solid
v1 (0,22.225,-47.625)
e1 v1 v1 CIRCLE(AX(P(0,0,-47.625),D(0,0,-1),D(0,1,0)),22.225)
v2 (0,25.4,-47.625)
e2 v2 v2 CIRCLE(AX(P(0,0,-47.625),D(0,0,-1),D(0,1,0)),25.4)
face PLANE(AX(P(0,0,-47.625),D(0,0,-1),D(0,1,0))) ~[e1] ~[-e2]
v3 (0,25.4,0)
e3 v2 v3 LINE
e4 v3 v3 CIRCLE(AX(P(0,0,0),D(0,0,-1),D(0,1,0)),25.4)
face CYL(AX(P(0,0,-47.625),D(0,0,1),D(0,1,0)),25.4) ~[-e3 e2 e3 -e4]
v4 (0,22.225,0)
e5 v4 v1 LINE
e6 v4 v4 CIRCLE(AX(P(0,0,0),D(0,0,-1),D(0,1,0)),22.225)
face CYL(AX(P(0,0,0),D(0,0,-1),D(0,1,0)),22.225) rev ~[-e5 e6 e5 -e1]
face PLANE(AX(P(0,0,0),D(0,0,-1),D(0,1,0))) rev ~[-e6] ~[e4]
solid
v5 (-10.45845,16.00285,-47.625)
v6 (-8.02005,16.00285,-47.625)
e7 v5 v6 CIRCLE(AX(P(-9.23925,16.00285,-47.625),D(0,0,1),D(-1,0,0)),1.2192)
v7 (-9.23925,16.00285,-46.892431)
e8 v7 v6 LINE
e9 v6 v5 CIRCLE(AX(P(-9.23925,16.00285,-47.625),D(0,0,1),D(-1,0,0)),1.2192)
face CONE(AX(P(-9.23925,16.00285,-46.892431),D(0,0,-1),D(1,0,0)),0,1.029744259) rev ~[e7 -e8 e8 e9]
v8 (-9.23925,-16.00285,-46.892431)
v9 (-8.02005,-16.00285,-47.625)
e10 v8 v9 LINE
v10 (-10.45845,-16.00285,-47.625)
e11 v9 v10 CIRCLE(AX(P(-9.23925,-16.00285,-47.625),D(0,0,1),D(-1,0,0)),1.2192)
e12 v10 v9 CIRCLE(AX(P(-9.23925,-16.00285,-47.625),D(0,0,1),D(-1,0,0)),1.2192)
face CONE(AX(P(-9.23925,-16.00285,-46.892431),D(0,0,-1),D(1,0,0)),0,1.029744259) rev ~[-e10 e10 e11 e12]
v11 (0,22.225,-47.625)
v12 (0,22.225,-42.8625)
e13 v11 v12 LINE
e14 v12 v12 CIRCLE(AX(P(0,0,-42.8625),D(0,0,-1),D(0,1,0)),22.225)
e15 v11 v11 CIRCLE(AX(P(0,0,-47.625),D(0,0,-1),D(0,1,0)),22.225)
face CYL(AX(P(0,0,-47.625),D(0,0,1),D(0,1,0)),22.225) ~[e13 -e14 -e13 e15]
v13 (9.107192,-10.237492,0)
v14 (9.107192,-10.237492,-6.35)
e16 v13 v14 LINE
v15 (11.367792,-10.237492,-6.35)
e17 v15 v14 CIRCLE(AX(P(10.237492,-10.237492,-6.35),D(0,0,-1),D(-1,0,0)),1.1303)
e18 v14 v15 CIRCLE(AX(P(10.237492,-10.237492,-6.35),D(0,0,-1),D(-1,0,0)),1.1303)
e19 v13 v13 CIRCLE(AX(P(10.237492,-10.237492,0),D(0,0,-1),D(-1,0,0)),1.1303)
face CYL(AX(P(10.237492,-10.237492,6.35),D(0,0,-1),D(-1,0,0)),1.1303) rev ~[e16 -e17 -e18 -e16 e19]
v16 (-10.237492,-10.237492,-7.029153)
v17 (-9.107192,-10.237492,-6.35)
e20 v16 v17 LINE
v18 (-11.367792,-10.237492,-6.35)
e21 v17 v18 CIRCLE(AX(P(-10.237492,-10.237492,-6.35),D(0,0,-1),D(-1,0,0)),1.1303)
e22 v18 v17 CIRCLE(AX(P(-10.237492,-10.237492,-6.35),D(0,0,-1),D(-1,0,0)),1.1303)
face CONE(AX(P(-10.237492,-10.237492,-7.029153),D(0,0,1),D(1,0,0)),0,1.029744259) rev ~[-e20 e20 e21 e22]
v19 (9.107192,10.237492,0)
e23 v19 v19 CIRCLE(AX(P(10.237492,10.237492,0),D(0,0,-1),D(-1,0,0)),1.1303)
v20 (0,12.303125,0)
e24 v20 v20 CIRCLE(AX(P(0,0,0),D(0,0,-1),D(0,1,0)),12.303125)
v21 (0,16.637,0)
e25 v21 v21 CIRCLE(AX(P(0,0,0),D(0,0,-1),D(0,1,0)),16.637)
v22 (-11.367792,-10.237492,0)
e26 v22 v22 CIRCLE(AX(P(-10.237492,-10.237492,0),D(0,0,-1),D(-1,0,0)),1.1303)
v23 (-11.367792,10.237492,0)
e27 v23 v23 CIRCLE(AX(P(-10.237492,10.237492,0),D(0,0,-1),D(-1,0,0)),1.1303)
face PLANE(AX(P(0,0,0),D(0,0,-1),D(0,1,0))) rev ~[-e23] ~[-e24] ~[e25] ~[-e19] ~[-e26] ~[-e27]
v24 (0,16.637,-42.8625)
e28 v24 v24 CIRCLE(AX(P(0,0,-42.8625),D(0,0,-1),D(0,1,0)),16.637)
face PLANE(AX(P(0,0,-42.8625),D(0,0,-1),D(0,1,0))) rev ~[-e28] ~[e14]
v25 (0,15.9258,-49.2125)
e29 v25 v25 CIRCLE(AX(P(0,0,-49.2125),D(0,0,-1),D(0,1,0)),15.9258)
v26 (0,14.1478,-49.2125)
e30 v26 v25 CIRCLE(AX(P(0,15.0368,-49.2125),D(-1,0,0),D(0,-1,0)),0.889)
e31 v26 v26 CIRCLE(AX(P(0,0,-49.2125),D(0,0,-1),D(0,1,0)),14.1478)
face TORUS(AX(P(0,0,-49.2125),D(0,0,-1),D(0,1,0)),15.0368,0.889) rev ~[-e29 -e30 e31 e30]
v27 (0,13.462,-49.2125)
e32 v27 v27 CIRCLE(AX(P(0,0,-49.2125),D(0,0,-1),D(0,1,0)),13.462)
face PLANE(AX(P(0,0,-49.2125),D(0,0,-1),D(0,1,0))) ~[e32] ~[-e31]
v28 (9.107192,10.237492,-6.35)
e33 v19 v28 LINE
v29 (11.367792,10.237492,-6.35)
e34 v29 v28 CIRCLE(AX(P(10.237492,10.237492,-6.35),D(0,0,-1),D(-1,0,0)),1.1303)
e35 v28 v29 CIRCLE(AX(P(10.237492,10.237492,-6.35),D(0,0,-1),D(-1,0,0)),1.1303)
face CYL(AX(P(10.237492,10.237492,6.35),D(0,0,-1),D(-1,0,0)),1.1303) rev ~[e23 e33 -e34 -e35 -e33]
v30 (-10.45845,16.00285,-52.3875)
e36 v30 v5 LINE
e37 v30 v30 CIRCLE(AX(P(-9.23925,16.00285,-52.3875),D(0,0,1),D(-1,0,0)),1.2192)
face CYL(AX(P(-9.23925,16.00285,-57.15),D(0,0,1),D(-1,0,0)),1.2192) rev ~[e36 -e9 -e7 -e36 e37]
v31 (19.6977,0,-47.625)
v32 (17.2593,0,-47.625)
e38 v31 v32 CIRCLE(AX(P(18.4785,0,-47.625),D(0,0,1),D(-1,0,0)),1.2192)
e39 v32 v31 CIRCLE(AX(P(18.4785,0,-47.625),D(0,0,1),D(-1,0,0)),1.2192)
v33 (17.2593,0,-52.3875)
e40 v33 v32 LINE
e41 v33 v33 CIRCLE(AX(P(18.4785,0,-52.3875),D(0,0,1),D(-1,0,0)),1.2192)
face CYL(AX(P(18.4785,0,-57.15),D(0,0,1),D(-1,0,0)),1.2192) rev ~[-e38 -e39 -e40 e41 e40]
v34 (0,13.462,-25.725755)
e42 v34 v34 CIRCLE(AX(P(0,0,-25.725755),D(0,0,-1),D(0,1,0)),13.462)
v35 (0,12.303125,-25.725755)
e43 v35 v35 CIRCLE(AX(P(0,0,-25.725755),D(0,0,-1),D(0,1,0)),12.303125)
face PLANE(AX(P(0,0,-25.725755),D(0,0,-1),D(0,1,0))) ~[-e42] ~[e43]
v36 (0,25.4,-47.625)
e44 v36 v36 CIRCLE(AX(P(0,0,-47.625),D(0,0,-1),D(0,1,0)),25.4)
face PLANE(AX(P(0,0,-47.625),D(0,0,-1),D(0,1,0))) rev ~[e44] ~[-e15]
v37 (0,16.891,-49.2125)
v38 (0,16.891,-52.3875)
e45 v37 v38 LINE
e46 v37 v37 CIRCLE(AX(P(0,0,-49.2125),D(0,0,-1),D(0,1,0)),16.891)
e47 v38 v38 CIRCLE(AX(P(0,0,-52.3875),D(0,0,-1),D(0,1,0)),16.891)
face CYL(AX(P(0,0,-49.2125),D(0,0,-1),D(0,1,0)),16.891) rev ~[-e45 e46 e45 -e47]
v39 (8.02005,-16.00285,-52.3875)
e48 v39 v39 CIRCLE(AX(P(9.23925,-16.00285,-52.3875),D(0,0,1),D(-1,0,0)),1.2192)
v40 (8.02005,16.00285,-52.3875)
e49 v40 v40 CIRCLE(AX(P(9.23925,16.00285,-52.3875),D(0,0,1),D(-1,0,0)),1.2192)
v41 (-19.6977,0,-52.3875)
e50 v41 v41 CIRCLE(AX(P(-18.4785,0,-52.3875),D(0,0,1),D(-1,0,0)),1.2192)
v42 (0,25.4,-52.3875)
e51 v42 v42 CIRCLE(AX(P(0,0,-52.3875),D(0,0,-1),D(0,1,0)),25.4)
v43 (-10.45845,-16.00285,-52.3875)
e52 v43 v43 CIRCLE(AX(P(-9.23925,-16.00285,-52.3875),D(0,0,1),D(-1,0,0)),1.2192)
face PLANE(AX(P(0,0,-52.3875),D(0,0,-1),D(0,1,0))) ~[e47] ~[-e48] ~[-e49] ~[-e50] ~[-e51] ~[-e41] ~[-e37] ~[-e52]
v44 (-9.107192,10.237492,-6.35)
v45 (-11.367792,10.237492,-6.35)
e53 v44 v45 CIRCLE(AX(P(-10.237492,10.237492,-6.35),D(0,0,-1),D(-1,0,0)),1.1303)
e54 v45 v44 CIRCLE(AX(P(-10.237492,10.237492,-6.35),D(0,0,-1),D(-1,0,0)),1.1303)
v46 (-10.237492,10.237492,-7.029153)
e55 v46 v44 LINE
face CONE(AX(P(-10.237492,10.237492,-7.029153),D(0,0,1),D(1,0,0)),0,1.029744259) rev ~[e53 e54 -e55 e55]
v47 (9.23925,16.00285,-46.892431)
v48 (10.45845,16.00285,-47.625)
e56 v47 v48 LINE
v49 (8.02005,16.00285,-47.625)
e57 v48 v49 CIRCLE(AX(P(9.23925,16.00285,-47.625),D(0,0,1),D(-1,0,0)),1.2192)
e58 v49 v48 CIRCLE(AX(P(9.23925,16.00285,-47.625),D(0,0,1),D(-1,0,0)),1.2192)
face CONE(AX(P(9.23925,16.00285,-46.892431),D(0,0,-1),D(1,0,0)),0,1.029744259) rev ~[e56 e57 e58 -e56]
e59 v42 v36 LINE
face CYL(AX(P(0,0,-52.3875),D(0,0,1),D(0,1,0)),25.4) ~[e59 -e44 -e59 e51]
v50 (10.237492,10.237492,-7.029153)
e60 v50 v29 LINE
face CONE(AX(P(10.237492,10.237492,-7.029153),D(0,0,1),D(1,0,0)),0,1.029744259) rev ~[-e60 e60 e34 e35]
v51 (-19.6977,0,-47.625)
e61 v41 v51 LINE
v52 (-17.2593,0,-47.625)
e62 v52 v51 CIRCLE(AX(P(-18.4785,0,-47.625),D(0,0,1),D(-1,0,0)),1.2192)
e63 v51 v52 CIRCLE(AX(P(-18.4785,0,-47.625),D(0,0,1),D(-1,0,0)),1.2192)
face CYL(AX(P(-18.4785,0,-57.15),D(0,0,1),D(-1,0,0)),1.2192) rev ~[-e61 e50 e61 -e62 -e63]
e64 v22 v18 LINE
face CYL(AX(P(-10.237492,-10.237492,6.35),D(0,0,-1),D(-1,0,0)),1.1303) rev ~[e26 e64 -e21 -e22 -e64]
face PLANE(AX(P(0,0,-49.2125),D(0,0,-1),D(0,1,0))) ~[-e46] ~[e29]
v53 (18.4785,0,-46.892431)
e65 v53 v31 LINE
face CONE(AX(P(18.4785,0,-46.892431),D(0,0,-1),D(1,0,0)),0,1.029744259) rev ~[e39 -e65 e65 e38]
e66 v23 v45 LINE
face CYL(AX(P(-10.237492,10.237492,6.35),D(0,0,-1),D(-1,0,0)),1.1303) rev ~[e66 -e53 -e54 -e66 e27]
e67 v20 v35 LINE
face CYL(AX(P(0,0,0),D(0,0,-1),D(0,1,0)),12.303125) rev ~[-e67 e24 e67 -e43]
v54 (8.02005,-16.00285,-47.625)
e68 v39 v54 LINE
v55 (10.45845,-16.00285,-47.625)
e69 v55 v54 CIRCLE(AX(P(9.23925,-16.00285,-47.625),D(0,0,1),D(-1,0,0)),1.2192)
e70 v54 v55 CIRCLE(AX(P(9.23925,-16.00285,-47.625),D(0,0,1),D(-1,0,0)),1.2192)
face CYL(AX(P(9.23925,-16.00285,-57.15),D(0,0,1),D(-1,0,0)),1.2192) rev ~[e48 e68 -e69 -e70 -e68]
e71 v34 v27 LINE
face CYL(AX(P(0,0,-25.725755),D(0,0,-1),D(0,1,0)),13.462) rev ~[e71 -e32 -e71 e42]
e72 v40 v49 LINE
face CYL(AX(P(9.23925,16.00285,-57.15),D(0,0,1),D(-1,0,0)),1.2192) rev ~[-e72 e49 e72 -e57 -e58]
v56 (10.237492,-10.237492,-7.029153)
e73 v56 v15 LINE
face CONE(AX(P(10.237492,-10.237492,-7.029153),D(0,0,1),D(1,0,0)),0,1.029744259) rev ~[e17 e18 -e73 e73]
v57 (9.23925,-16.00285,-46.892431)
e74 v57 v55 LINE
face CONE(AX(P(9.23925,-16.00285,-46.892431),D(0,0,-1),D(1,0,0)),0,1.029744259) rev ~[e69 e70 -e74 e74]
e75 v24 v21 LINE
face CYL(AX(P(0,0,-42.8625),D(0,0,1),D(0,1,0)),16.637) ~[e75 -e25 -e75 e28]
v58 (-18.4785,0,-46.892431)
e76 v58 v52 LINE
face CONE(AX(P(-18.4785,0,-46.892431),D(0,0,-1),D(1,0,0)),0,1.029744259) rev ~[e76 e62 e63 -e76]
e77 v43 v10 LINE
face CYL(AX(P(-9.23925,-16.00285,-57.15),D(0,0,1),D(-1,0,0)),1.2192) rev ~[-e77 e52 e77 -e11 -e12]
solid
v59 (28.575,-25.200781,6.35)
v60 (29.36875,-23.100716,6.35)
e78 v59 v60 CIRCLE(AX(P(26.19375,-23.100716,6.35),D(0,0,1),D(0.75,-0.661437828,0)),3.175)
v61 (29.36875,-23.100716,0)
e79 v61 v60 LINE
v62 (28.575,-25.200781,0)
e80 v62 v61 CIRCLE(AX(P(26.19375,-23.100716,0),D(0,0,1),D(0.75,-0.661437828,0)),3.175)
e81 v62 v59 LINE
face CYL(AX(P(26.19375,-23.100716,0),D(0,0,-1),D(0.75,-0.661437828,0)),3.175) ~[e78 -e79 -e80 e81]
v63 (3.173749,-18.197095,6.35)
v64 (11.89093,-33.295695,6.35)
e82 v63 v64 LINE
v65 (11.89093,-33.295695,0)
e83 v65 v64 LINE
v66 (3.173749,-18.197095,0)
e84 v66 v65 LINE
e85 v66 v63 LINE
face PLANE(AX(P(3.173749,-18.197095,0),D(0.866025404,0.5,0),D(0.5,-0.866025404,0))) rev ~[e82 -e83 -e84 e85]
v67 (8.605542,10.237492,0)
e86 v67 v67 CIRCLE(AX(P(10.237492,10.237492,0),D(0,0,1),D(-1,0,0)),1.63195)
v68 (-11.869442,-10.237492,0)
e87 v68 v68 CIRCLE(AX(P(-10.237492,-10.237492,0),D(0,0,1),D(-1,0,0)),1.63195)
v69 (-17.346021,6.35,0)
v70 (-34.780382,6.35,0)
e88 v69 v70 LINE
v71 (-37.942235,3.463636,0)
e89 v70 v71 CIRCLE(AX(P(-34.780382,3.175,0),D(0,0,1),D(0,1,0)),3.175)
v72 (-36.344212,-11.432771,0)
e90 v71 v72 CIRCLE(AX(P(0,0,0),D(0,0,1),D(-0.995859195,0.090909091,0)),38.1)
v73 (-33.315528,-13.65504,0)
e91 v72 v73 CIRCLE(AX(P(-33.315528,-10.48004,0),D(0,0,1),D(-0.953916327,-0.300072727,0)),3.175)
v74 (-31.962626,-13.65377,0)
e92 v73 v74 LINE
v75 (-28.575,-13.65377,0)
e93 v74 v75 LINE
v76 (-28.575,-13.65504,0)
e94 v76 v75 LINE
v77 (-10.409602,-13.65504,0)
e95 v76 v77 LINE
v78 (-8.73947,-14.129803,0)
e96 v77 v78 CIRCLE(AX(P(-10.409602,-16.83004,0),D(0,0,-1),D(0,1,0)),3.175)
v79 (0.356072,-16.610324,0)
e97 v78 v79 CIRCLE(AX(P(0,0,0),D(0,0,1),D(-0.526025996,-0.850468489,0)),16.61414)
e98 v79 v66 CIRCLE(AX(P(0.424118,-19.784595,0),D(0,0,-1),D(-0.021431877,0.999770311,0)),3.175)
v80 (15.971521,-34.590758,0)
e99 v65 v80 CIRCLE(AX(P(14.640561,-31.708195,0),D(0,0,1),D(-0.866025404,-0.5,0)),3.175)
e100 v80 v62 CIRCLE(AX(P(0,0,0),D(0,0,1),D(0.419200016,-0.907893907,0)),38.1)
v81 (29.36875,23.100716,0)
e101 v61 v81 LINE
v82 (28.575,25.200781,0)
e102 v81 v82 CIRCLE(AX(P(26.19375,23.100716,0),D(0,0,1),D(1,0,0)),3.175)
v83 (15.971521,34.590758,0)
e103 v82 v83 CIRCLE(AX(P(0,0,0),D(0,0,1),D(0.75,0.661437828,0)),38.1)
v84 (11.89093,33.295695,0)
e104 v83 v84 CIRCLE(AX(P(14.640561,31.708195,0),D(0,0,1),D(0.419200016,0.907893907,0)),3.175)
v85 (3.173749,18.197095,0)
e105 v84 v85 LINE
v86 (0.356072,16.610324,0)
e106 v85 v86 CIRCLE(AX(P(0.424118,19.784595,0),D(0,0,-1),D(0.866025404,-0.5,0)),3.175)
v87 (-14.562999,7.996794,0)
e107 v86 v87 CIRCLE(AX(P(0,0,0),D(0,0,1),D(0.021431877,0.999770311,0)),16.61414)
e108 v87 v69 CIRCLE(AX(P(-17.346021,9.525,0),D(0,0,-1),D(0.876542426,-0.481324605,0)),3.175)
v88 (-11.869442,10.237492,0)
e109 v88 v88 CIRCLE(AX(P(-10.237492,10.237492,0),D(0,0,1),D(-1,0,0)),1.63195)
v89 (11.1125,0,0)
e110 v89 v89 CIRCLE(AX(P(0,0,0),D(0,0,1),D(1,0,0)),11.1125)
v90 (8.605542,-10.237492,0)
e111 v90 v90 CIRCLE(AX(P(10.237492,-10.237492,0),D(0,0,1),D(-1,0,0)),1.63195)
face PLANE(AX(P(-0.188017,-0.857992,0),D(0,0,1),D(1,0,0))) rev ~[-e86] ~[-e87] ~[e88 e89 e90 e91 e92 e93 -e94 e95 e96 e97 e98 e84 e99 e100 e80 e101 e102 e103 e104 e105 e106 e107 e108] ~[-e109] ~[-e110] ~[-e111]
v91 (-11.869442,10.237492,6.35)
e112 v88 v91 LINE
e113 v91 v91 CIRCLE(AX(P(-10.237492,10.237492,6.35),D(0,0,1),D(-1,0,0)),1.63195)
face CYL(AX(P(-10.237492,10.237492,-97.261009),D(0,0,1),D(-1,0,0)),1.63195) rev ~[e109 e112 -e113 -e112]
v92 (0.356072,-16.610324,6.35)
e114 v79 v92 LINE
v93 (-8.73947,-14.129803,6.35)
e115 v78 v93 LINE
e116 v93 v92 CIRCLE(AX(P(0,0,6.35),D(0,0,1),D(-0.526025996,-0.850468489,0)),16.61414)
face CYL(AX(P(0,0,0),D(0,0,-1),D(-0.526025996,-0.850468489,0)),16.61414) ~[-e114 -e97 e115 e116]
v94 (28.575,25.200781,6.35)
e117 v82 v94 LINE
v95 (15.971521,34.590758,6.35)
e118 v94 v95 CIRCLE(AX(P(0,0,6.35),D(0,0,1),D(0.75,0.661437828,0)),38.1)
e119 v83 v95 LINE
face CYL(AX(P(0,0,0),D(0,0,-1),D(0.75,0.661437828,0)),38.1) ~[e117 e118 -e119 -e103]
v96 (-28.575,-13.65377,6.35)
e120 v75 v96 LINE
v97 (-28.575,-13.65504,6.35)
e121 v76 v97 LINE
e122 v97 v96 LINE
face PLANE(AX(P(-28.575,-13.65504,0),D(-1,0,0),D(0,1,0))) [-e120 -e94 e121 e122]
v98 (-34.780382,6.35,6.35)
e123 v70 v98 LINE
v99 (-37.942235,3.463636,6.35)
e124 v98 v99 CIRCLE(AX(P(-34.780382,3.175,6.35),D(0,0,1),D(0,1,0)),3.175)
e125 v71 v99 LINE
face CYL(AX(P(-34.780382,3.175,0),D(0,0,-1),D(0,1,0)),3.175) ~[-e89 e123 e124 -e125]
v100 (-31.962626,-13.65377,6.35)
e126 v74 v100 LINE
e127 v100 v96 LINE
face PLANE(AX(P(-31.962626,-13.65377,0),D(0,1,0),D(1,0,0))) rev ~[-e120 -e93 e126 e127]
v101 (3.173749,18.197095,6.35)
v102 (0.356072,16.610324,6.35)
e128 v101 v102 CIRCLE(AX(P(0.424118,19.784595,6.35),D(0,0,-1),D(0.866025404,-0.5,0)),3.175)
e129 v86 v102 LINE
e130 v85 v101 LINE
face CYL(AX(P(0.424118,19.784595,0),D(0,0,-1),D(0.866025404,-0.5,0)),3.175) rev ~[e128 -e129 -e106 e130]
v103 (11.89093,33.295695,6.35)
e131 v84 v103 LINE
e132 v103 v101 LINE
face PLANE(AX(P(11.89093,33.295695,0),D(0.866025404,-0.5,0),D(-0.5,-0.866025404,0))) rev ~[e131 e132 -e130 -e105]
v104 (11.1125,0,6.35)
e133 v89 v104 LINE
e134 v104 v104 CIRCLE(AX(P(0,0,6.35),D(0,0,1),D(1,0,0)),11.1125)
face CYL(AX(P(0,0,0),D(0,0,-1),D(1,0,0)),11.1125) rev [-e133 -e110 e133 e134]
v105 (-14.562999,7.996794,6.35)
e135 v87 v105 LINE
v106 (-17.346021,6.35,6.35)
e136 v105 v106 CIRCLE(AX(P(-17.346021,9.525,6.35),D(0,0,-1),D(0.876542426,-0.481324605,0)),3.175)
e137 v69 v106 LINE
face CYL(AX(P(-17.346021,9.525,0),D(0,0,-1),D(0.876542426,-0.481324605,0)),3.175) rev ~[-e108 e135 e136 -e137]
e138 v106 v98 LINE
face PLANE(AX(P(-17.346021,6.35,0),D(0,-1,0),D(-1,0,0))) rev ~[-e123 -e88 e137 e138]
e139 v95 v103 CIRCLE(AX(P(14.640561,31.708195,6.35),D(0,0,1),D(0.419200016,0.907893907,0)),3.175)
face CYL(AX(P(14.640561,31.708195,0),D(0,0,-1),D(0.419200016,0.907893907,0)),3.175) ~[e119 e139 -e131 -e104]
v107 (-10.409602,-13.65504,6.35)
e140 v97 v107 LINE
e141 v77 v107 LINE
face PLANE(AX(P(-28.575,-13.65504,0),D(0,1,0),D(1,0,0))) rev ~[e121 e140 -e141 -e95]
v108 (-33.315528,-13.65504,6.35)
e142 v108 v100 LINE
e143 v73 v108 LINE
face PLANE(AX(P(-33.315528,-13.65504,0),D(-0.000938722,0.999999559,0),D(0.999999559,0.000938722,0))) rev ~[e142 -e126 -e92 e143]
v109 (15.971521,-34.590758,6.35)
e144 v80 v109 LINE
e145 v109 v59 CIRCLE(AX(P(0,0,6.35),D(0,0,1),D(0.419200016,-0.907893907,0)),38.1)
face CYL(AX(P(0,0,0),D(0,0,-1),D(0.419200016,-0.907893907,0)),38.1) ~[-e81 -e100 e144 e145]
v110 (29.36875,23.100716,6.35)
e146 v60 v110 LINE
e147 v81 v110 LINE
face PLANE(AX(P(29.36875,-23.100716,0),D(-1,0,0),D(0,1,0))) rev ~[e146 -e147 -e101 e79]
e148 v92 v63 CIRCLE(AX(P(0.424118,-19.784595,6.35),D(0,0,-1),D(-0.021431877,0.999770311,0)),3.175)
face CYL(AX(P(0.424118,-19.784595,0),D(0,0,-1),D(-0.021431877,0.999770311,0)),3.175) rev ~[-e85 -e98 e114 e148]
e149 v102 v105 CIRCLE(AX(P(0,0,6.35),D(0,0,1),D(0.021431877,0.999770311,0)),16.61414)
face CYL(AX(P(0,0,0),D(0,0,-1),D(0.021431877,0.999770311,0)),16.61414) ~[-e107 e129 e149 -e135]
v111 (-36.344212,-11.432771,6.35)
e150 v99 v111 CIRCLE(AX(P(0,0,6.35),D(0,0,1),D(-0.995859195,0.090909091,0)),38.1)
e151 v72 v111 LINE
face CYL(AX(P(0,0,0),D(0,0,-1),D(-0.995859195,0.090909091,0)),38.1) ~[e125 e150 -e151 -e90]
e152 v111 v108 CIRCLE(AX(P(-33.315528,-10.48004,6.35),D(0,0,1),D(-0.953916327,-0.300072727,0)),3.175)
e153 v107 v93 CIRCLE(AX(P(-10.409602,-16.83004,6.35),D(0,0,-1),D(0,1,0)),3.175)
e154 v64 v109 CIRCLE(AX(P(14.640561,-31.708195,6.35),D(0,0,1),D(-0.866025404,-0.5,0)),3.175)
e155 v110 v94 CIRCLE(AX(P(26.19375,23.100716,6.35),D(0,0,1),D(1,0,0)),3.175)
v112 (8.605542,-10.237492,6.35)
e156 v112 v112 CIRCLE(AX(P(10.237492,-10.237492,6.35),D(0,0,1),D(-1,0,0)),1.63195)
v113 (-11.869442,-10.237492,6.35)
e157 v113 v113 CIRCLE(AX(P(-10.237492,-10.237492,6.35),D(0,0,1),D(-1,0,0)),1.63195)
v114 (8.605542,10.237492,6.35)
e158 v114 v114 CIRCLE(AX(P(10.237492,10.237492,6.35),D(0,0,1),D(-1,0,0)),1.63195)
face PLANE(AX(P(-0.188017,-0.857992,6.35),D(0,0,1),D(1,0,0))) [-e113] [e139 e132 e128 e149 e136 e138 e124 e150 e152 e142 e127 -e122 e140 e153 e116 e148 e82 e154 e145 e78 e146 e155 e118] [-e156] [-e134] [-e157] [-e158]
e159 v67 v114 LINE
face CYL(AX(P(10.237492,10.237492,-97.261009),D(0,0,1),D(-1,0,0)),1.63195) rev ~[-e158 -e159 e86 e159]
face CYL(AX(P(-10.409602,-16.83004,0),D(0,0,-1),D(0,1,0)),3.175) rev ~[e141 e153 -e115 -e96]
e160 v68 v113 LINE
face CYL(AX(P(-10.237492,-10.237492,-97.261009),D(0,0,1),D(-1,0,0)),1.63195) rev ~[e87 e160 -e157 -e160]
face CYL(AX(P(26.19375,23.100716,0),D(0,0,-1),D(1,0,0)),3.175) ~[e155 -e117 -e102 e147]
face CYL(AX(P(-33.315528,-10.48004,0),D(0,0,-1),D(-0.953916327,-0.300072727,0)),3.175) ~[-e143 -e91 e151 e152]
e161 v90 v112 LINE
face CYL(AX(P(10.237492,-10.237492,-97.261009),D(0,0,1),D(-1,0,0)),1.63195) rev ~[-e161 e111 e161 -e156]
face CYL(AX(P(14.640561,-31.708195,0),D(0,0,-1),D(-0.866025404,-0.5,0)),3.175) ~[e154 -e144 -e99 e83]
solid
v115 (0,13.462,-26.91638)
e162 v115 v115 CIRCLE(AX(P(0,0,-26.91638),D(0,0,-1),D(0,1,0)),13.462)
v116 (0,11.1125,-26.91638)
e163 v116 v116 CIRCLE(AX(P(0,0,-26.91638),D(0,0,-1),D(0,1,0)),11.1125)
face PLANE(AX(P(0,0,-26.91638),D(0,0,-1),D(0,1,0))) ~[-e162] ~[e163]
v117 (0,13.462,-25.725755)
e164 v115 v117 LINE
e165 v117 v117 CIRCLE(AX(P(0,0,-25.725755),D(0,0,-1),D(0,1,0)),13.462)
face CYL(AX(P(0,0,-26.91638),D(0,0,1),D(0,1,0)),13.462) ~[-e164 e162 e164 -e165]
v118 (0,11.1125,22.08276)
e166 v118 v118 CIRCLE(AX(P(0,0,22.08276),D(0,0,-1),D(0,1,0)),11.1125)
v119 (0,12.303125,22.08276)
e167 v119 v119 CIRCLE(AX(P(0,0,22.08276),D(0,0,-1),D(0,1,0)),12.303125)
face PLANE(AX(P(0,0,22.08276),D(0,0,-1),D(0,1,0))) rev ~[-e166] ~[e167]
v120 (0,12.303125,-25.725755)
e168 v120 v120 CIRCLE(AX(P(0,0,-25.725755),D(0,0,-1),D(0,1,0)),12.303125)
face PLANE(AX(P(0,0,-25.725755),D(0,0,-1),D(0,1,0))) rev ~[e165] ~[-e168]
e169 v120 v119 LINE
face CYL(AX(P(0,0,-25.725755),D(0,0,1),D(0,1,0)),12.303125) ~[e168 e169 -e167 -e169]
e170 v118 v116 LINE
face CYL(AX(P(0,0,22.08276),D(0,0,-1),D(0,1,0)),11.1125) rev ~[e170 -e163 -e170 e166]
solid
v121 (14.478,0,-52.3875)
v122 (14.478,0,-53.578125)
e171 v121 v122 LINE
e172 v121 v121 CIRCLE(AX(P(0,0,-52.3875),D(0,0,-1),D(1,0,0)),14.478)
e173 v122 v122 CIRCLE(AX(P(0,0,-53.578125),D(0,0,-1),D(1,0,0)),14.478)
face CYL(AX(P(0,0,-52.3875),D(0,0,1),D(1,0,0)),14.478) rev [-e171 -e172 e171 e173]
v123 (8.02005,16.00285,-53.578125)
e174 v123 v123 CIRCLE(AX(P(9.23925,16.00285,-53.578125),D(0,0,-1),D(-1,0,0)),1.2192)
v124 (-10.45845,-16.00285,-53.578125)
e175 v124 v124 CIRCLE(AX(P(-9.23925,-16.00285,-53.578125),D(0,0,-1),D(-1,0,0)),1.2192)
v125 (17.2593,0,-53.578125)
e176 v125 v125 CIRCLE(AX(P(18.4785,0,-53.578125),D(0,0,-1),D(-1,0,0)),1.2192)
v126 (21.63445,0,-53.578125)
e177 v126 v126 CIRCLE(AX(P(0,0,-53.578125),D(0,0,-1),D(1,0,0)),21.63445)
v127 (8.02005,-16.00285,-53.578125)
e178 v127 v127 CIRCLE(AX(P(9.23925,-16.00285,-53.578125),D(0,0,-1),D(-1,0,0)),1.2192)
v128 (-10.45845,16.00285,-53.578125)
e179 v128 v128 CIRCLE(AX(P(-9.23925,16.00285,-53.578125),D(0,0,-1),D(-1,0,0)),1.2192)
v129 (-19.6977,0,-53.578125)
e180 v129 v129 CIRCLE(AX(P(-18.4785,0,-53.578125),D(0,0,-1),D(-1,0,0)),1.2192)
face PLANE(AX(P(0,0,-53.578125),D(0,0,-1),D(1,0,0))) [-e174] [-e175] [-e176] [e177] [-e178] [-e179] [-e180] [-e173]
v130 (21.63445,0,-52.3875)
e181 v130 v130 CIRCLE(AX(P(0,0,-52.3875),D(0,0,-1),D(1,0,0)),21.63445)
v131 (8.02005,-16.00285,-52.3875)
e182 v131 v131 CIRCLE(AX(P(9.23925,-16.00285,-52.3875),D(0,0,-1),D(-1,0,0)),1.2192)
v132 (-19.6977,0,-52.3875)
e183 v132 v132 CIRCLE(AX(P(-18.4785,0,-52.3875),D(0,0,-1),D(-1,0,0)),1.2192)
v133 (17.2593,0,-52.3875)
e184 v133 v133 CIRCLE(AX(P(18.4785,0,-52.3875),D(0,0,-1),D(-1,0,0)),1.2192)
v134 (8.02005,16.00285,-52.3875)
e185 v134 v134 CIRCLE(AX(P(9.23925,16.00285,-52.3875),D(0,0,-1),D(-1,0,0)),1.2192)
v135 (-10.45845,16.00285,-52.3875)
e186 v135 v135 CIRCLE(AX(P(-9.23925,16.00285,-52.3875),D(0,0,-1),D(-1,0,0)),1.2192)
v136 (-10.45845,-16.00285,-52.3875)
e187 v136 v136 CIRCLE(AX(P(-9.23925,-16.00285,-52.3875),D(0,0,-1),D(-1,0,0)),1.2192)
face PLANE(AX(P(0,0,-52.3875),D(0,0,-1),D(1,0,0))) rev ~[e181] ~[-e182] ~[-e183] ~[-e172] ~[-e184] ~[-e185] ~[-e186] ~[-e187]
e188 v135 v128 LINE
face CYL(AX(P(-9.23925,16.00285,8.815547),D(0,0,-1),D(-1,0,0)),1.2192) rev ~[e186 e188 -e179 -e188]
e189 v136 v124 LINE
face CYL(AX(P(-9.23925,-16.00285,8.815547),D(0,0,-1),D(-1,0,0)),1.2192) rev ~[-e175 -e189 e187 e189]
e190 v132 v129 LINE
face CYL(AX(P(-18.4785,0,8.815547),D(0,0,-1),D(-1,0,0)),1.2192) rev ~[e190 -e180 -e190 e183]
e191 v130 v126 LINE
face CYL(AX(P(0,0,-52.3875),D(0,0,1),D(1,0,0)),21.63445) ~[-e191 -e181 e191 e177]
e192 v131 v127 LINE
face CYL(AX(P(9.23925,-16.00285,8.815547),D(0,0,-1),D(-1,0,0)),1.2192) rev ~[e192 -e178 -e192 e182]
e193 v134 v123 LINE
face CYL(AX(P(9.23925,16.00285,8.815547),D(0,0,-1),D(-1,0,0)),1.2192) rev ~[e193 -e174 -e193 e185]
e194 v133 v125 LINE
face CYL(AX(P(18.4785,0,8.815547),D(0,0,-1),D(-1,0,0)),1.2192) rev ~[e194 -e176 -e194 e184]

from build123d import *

# Parameters (mm, degrees)
F0_W      = 12.7
F0_H      = 12.86002
F0_R      = 11.1125
F0_H_2    = 0.00127
F1_DEPTH  = 6.35
F12_D     = 2.4384
F12_DEPTH = 4.7625
F12_TIP   = 0.7325692667
F11_R     = 21.63445
F11_R_2   = 14.478
F13_DEPTH = 1.190625
F14_D     = 2.4384
F16_D     = 2.2606
F16_DEPTH = 6.35
F16_TIP   = 0.6791527577
F17_D     = 3.2639


# Not quite as in the source:
# - a feature names something its author has since deleted; it is built from what else it names


with BuildPart() as f1:
    # F0 (on Top) → F1 (new body)
    with BuildSketch(Plane.XY):
        with BuildLine():
            ThreePointArc((29.36875, 23.1007161347), (29.1636905508, 24.2232481499), (28.575, 25.2007812379))
            ThreePointArc((28.575, 25.2007812379), (22.762711603, 30.5527242726), (15.9715205932, 34.5907578688))
            ThreePointArc((15.9715205932, 34.5907578688), (13.6801160021, 34.7344417755), (11.8909298868, 33.2956947131))
            Line((11.8909298868, 33.2956947131), (3.1737490765, 18.197094651))
            ThreePointArc((3.1737490765, 18.197094651), (1.9820606936, 17.0181093591), (0.3560722092, 16.6103239138))
            ThreePointArc((0.3560722092, 16.6103239138), (-8.30707, 14.388267302), (-14.5629985791, 7.9967943781))
            ThreePointArc((-14.5629985791, 7.9967943781), (-15.7291453761, 6.792539767), (-17.3460207811, 6.35))
            Line((-17.3460207811, 6.35), (-34.7803824016, 6.35))
            ThreePointArc((-34.7803824016, 6.35), (-36.9209669649, 5.5198929032), (-37.9422353472, 3.4636363636))
            ThreePointArc((-37.9422353472, 3.4636363636), (-37.8826451562, -4.0638892662), (-36.3442120473, -11.4327709091))
            ThreePointArc((-36.3442120473, -11.4327709091), (-35.1937854617, -13.039878436), (-33.31552771, -13.65504))
            Line((-33.31552771, -13.65504), (-31.9626256824, -13.65377))
            Line((-31.9626256824, -13.65377), (-28.575, -13.65377))
            Line((-28.575, -13.65377), (-28.575, -6.35))
            Line((-28.575, -6.35), (-28.575, -0.79375))
            Line((-28.575, -0.79375), (-15.875, -0.79375))
            Line((-15.875, -0.79375), (-15.875, -13.65377))
            Line((-15.875, -13.65377), (-15.875, -13.65504))
            Line((-15.875, -13.65504), (-10.4096020836, -13.65504))
            ThreePointArc((-10.4096020836, -13.65504), (-9.5414514384, -13.7760361596), (-8.7394695454, -14.1298025465))
            ThreePointArc((-8.7394695454, -14.1298025465), (-4.3713366706, -16.0287573958), (0.3560722092, -16.6103239138))
            ThreePointArc((0.3560722092, -16.6103239138), (1.9820606936, -17.0181093591), (3.1737490765, -18.197094651))
            Line((3.1737490765, -18.197094651), (11.8909298868, -33.2956947131))
            ThreePointArc((11.8909298868, -33.2956947131), (13.6801160021, -34.7344417755), (15.9715205932, -34.5907578688))
            ThreePointArc((15.9715205932, -34.5907578688), (22.762711603, -30.5527242726), (28.575, -25.2007812379))
            ThreePointArc((28.575, -25.2007812379), (29.1636905508, -24.2232481499), (29.36875, -23.1007161347))
            Line((29.36875, -23.1007161347), (29.36875, 23.1007161347))
        make_face()
        with Locations((22.225, -7.22376)):
            Rectangle(F0_W, F0_H, mode=Mode.SUBTRACT)
        Circle(F0_R, mode=Mode.SUBTRACT)
        with Locations((-22.225, -13.654405)):
            Rectangle(F0_W, F0_H_2)
        Polygon((-28.575, -13.65377), (-15.875, -13.65377), (-15.875, -0.79375), (-28.575, -0.79375), (-28.575, -6.35), align=None)
        with Locations((22.225, -7.22376)):
            Rectangle(F0_W, F0_H)
    extrude(amount=F1_DEPTH)

    # F17 (through all)
    with Locations(Plane(origin=(0, 0, 0), x_dir=(1, 0, 0), z_dir=(0, 0, -1))):
        with Locations((-10.237491978, -10.237491978), (10.237491978, -10.237491978), (10.237491978, 10.237491978), (-10.237491978, 10.237491978)):
            Hole(F17_D / 2)


with BuildPart() as f6:
    # F5 (on Right) → F6 (revolve)
    with BuildSketch(Plane.YZ):
        Polygon((12.303125, 22.08276), (11.1125, 22.08276), (11.1125, -26.91638), (13.462, -26.91638), (13.462, -25.725755), (12.303125, -25.725755), align=None)
    revolve(axis=Axis((0, 0, -24.5783533533), (0, 0, -1)))


with BuildPart() as f8:
    # F7 (on Right) → F8 (revolve)
    with BuildSketch(Plane.YZ):
        with BuildLine():
            Line((13.462, -25.725755), (13.462, -26.91638))
            Line((13.462, -26.91638), (13.462, -49.2125))
            Line((13.462, -49.2125), (14.1478, -49.2125))
            ThreePointArc((14.1478, -49.2125), (15.0368, -48.3235), (15.9258, -49.2125))
            Line((15.9258, -49.2125), (16.891, -49.2125))
            Line((16.891, -49.2125), (16.891, -52.3875))
            Line((16.891, -52.3875), (25.4, -52.3875))
            Line((25.4, -52.3875), (25.4, -47.625))
            Line((25.4, -47.625), (22.225, -47.625))
            Line((22.225, -47.625), (22.225, -42.8625))
            Line((22.225, -42.8625), (16.637, -42.8625))
            Line((16.637, -42.8625), (16.637, 0))
            Line((16.637, 0), (12.303125, 0))
            Line((12.303125, 0), (12.303125, -25.725755))
            Line((12.303125, -25.725755), (13.462, -25.725755))
        make_face()
    revolve(axis=Axis((0, 0, -24.60625), (0, 0, -1)))

    # F12
    with Locations(Plane(origin=(0, 0, -52.3875), x_dir=(1, 0, 0), z_dir=(0, 0, -1))):
        with Locations((-18.4785, 0), (9.23925, 16.0028504238), (18.4785, 0), (9.23925, -16.0028504238), (-9.23925, -16.0028504238), (-9.23925, 16.0028504238)):
            Hole(F12_D / 2, depth=F12_DEPTH)
            with Locations((0, 0, -(F12_DEPTH + F12_TIP / 2))):  # 118° drill point
                Cone(0, F12_D / 2, F12_TIP, mode=Mode.SUBTRACT)

    # F16
    with Locations(Plane.XY):
        with Locations((-10.237491978, 10.237491978), (10.237491978, 10.237491978), (10.237491978, -10.237491978), (-10.237491978, -10.237491978)):
            Hole(F16_D / 2, depth=F16_DEPTH)
            with Locations((0, 0, -(F16_DEPTH + F16_TIP / 2))):  # 118° drill point
                Cone(0, F16_D / 2, F16_TIP, mode=Mode.SUBTRACT)


with BuildPart() as f10:
    # F9 (on Right) → F10 (revolve)
    with BuildSketch(Plane.YZ):
        Polygon((22.225, -42.8625), (22.225, -47.625), (25.4, -47.625), (25.4, 0), (22.225, 0), align=None)
    revolve(axis=Axis((0, 0, -24.60625), (0, 0, -1)))


with BuildPart() as f13:
    # F11 (on face) → F13 (new body)
    with BuildSketch(Plane(origin=(0, 0, -52.3875), x_dir=(1, 0, 0), z_dir=(0, 0, -1))):
        Circle(F11_R)
        Circle(F11_R_2, mode=Mode.SUBTRACT)
    extrude(amount=F13_DEPTH)

    # F14 (through all)
    with Locations(Plane.XY.offset(-52.3875)):
        with Locations((9.23925, -16.0028504238), (18.4785, 0), (9.23925, 16.0028504238), (-9.23925, 16.0028504238), (-18.4785, 0), (-9.23925, -16.0028504238)):
            Hole(F14_D / 2)


solid = Compound([f1.part, f6.part, f8.part, f10.part, f13.part])
